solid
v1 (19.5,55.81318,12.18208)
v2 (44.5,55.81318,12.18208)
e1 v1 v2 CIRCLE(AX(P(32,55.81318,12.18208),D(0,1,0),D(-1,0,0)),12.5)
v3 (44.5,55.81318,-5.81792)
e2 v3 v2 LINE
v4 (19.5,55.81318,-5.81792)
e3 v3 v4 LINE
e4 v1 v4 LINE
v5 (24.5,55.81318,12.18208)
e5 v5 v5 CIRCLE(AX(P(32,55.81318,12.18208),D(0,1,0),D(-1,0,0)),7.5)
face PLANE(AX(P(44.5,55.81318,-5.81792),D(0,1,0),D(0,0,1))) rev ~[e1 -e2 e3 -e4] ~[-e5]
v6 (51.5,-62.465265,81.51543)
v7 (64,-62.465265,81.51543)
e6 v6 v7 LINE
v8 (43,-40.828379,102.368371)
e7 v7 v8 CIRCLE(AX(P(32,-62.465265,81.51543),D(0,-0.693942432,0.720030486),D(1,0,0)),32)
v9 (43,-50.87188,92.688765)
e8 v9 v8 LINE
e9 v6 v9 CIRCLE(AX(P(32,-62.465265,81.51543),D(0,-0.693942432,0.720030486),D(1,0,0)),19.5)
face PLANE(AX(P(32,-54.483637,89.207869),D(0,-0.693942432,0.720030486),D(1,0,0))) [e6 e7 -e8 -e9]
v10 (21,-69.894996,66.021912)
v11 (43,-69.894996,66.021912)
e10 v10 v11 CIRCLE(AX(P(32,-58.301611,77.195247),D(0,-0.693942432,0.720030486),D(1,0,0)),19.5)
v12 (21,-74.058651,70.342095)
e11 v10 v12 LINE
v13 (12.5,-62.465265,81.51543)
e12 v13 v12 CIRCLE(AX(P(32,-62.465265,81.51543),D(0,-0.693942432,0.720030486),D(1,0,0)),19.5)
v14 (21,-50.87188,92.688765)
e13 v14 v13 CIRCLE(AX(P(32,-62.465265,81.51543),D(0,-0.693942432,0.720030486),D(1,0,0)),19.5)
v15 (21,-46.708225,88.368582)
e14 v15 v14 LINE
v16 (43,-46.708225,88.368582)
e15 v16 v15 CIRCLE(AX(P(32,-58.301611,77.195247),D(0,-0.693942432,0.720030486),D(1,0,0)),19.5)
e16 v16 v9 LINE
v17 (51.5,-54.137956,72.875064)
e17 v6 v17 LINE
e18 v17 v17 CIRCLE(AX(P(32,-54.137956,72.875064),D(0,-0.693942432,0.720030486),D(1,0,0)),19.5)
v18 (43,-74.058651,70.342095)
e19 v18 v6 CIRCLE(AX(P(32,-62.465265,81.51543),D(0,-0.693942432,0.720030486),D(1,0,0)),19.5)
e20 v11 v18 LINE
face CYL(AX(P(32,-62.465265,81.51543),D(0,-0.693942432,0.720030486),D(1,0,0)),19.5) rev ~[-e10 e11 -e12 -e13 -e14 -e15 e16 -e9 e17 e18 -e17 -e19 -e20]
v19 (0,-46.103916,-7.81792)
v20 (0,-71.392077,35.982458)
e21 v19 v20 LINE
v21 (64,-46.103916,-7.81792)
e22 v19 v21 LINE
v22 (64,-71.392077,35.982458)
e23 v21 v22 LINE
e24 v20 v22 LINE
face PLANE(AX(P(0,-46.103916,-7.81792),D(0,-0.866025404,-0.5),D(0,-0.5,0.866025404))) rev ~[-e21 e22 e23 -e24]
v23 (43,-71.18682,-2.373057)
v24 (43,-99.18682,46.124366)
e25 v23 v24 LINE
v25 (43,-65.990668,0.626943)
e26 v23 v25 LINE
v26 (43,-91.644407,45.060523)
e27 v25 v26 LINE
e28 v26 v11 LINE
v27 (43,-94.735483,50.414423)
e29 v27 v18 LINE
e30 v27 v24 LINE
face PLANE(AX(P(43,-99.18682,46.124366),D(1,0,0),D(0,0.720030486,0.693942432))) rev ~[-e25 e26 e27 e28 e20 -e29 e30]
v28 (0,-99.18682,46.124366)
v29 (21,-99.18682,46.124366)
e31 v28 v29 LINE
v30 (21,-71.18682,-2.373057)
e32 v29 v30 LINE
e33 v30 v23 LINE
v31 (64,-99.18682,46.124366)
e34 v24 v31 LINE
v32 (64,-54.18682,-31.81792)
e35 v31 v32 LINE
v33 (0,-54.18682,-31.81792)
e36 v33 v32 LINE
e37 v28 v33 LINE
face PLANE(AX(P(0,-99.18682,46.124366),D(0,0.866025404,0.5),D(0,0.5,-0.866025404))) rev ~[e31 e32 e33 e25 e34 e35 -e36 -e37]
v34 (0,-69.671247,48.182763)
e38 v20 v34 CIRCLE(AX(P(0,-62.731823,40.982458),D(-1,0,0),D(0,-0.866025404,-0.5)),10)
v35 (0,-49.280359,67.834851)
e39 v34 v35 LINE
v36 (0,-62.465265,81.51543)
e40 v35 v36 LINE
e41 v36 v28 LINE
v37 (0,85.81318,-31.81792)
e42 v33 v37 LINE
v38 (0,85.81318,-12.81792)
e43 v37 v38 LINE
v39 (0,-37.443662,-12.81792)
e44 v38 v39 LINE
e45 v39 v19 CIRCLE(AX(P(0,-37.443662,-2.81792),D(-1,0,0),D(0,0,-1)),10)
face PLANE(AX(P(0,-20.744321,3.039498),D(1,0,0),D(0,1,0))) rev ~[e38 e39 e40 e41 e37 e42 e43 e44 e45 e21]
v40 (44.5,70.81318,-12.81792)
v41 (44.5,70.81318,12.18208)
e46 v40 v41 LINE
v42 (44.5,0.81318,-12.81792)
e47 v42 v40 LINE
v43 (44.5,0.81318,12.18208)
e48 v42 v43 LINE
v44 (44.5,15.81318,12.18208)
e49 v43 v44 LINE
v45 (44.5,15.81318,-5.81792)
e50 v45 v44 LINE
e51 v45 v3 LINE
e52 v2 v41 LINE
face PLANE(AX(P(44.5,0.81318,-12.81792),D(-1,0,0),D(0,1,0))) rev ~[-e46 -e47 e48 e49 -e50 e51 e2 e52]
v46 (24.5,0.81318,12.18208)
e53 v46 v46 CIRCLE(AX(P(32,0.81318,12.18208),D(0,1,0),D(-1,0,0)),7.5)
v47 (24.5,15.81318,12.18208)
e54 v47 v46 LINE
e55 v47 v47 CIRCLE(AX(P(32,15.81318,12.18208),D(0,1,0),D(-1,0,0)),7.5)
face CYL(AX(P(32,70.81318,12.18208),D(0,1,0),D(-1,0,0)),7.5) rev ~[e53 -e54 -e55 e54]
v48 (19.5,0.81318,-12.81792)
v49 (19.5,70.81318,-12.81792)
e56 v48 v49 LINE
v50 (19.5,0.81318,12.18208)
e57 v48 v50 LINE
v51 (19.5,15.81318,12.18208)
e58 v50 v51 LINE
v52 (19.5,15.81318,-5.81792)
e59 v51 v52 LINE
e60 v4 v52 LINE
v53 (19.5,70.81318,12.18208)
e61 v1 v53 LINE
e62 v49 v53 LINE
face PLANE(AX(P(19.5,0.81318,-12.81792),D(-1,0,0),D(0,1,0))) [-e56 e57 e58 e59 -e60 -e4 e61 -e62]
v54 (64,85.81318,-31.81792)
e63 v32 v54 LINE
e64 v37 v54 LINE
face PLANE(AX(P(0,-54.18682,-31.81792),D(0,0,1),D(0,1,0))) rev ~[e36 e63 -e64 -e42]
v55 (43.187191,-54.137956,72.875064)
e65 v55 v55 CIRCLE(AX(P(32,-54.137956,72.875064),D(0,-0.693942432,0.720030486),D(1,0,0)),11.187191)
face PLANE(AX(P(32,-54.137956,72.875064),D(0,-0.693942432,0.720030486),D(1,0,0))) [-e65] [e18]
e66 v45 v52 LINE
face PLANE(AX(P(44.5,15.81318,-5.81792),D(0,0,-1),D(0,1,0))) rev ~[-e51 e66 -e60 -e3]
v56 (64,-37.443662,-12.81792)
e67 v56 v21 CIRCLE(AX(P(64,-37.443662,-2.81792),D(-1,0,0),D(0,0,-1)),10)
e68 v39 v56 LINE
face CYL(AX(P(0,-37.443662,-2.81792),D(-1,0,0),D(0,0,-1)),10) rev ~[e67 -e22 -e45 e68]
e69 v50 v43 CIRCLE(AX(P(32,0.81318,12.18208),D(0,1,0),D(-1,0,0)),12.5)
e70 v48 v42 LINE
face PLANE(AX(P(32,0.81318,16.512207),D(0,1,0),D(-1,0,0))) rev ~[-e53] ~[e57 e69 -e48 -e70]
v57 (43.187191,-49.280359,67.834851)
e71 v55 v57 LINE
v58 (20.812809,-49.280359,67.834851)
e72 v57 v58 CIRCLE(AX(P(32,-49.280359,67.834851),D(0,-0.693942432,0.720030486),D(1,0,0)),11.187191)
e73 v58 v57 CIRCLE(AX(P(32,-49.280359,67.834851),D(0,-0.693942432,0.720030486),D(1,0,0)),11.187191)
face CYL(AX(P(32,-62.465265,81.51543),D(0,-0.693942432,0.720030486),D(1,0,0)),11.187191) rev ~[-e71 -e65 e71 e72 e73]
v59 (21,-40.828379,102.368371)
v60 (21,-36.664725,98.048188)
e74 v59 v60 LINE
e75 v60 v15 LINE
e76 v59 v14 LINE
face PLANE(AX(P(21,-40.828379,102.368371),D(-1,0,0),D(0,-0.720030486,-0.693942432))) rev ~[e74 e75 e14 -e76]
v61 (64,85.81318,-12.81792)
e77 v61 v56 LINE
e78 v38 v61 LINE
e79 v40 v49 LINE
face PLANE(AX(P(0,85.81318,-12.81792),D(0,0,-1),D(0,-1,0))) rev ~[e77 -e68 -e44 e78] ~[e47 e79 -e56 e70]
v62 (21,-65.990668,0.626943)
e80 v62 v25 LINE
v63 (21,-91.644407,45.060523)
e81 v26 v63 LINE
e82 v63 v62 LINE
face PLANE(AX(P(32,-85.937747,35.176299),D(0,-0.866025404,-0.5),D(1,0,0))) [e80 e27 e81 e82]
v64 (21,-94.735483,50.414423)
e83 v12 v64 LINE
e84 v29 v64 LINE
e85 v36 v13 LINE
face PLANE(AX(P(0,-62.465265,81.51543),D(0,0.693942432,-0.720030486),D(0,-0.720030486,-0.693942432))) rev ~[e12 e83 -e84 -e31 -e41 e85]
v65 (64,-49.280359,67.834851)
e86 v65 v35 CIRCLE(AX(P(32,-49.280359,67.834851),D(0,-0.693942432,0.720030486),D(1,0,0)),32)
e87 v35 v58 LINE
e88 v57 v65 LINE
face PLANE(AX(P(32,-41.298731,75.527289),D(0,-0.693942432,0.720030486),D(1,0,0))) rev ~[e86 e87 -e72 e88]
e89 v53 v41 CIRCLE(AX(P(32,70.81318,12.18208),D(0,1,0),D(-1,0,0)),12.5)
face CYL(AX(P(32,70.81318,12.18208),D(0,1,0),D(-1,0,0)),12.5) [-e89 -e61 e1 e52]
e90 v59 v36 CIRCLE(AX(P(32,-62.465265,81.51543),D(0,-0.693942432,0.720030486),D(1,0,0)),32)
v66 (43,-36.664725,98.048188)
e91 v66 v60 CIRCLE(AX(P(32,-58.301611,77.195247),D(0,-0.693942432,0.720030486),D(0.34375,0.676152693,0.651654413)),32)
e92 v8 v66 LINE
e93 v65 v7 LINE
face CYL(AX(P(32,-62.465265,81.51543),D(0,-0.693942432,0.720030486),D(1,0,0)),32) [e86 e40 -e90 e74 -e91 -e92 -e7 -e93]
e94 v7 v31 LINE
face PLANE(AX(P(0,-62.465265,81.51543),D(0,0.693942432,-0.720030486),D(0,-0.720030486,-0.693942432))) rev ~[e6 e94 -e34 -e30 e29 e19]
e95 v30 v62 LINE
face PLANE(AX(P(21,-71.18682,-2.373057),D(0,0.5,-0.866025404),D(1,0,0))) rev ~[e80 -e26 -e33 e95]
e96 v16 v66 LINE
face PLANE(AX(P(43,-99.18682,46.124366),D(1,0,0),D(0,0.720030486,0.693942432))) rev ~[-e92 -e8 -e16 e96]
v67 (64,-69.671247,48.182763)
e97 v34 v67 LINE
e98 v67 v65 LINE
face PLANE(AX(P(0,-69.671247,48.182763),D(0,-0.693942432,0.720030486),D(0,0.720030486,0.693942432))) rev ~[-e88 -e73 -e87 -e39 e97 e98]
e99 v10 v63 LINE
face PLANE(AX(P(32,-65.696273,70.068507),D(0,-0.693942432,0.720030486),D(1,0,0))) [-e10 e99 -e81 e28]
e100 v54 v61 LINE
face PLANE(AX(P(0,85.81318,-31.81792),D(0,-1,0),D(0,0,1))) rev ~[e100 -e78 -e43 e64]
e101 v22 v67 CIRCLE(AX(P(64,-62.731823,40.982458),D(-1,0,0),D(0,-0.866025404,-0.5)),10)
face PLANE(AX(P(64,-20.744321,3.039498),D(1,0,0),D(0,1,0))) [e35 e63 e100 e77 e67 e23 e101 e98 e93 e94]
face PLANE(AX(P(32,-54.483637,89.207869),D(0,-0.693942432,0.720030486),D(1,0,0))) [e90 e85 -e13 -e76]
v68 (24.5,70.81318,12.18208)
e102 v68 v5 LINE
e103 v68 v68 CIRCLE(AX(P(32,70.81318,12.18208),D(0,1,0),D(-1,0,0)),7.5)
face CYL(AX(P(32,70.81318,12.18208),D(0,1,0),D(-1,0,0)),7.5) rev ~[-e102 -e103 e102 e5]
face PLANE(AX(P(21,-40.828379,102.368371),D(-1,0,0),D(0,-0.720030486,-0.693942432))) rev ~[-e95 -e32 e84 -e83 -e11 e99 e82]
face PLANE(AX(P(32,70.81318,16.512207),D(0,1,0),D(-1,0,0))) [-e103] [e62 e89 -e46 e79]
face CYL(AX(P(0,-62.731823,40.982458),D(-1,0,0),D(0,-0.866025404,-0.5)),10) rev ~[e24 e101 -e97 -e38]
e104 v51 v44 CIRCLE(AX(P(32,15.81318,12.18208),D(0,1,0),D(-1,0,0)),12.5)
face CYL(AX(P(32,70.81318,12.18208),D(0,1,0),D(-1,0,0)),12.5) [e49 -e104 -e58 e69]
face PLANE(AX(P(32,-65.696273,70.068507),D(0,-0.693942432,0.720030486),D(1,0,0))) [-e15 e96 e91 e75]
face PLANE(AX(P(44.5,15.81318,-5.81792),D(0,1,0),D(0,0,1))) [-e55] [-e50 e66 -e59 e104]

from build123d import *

# Parameters (mm, degrees)
F1_DEPTH  = 64
F4_DEPTH  = 19
F6_DEPTH  = 6
F8_DEPTH  = 6
F9_R      = 19.5
F10_DEPTH = 12
F11_R     = 11.1871907606
F12_DEPTH = 25
F13_W     = 12.5
F13_H     = 70
F14_DEPTH = 25
F16_DEPTH = 70
F17_R     = 7.5
F18_DEPTH = 70
F19_W     = 40
F19_H     = 38.5815599019
F20_DEPTH = 44.501


with BuildPart() as f1:
    # F0 (on Right) → F1 (new body)
    with BuildSketch(Plane.YZ):
        with BuildLine():
            Line((-54.1868201462, -31.8179203436), (85.8131798538, -31.8179203436))
            Line((85.8131798538, -31.8179203436), (85.8131798538, -12.8179203436))
            Line((85.8131798538, -12.8179203436), (-37.4436623397, -12.8179203436))
            ThreePointArc((-37.4436623397, -12.8179203436), (-42.4436623397, -11.4781743814), (-46.1039163775, -7.8179203436))
            Line((-46.1039163775, -7.8179203436), (-71.3920766998, 35.9824581646))
            ThreePointArc((-71.3920766998, 35.9824581646), (-72.6338098814, 42.3791145671), (-69.671246979, 48.1827630296))
            Line((-69.671246979, 48.1827630296), (-49.2803591326, 67.8348507705))
            Line((-49.2803591326, 67.8348507705), (-62.4652653349, 81.5154300139))
            Line((-62.4652653349, 81.5154300139), (-99.1868201462, 46.124365997))
            Line((-99.1868201462, 46.124365997), (-54.1868201462, -31.8179203436))
        make_face()
    extrude(amount=F1_DEPTH)

    # F3 (on face) → F4 (join)
    with BuildSketch(Plane(origin=(0, -70.8105053198, 73.4725537235), x_dir=(1, 0, 0), z_dir=(0, -0.6939424317, 0.7200304865))):
        with BuildLine():
            Line((0, 11.5901203371), (64, 11.5901203371))
            ThreePointArc((64, 11.5901203371), (32, 43.5901203371), (0, 11.5901203371))
        make_face()
    extrude(amount=-F4_DEPTH)

    # F2 (on face) → F6 (cut)
    with BuildSketch(Plane(origin=(0, -54.4176787662, -31.4180614843), x_dir=(1, 0, 0), z_dir=(0, -0.8660254038, -0.5))):
        Polygon((21, 113.3266016841), (21, 89.53828276), (21, 33.53828276), (43, 33.53828276), (43, 89.53828276), (43, 113.3266016841), align=None)
    extrude(amount=-F6_DEPTH, mode=Mode.SUBTRACT)

    # F7 (on face) → F8 (cut)
    with BuildSketch(Plane(origin=(0, -70.8105053198, 73.4725537235), x_dir=(1, 0, 0), z_dir=(0, -0.6939424317, 0.7200304865))):
        with BuildLine():
            Line((21, 41.6400787397), (21, -39.4098796629))
            Line((21, -39.4098796629), (43, -39.4098796629))
            Line((43, -39.4098796629), (43, 41.6400787397))
            ThreePointArc((43, 41.6400787397), (32, 43.5901203371), (21, 41.6400787397))
        make_face()
    extrude(amount=-F8_DEPTH, mode=Mode.SUBTRACT)

    # F9 (on face) → F10 (cut)
    with BuildSketch(Plane(origin=(0, -70.8105053198, 73.4725537235), x_dir=(1, 0, 0), z_dir=(0, -0.6939424317, 0.7200304865))):
        with Locations((32, 11.5901203371)):
            Circle(F9_R)
    extrude(amount=-F10_DEPTH, mode=Mode.SUBTRACT)

    # F11 (on face) → F12 (cut)
    with BuildSketch(Plane(origin=(0, -70.8105053198, 73.4725537235), x_dir=(1, 0, 0), z_dir=(0, -0.6939424317, 0.7200304865))):
        with Locations((32, 11.5901203371)):
            Circle(F11_R)
    extrude(amount=-F12_DEPTH, mode=Mode.SUBTRACT)

    # F13 (on face) → F14 (join)
    with BuildSketch(Plane.XY.offset(-12.8179203436)):
        with Locations((25.75, 35.8131798538)):
            Rectangle(F13_W, F13_H)
        with Locations((38.25, 35.8131798538)):
            Rectangle(F13_W, F13_H)
    extrude(amount=F14_DEPTH)

    # F15 (on face) → F16 (join, through all)
    with BuildSketch(Plane(origin=(0, 70.8131798538, 0), x_dir=(-1, 0, 0), z_dir=(0, 1, 0))):
        with BuildLine():
            Line((-44.5, 12.1820796564), (-19.5, 12.1820796564))
            ThreePointArc((-19.5, 12.1820796564), (-32, 24.6820796564), (-44.5, 12.1820796564))
        make_face()
    extrude(amount=-F16_DEPTH)

    # F17 (on face) → F18 (cut, through all)
    with BuildSketch(Plane(origin=(0, 70.8131798538, 0), x_dir=(-1, 0, 0), z_dir=(0, 1, 0))):
        with Locations((-32, 12.1820796564)):
            Circle(F17_R)
    extrude(amount=-F18_DEPTH, mode=Mode.SUBTRACT)

    # F19 (on face) → F20 (cut, through all)
    with BuildSketch(Plane.YZ.offset(44.5)):
        with Locations((35.8131798538, 13.4728596074)):
            Rectangle(F19_W, F19_H)
    extrude(amount=-F20_DEPTH, mode=Mode.SUBTRACT)


solid = f1.part
